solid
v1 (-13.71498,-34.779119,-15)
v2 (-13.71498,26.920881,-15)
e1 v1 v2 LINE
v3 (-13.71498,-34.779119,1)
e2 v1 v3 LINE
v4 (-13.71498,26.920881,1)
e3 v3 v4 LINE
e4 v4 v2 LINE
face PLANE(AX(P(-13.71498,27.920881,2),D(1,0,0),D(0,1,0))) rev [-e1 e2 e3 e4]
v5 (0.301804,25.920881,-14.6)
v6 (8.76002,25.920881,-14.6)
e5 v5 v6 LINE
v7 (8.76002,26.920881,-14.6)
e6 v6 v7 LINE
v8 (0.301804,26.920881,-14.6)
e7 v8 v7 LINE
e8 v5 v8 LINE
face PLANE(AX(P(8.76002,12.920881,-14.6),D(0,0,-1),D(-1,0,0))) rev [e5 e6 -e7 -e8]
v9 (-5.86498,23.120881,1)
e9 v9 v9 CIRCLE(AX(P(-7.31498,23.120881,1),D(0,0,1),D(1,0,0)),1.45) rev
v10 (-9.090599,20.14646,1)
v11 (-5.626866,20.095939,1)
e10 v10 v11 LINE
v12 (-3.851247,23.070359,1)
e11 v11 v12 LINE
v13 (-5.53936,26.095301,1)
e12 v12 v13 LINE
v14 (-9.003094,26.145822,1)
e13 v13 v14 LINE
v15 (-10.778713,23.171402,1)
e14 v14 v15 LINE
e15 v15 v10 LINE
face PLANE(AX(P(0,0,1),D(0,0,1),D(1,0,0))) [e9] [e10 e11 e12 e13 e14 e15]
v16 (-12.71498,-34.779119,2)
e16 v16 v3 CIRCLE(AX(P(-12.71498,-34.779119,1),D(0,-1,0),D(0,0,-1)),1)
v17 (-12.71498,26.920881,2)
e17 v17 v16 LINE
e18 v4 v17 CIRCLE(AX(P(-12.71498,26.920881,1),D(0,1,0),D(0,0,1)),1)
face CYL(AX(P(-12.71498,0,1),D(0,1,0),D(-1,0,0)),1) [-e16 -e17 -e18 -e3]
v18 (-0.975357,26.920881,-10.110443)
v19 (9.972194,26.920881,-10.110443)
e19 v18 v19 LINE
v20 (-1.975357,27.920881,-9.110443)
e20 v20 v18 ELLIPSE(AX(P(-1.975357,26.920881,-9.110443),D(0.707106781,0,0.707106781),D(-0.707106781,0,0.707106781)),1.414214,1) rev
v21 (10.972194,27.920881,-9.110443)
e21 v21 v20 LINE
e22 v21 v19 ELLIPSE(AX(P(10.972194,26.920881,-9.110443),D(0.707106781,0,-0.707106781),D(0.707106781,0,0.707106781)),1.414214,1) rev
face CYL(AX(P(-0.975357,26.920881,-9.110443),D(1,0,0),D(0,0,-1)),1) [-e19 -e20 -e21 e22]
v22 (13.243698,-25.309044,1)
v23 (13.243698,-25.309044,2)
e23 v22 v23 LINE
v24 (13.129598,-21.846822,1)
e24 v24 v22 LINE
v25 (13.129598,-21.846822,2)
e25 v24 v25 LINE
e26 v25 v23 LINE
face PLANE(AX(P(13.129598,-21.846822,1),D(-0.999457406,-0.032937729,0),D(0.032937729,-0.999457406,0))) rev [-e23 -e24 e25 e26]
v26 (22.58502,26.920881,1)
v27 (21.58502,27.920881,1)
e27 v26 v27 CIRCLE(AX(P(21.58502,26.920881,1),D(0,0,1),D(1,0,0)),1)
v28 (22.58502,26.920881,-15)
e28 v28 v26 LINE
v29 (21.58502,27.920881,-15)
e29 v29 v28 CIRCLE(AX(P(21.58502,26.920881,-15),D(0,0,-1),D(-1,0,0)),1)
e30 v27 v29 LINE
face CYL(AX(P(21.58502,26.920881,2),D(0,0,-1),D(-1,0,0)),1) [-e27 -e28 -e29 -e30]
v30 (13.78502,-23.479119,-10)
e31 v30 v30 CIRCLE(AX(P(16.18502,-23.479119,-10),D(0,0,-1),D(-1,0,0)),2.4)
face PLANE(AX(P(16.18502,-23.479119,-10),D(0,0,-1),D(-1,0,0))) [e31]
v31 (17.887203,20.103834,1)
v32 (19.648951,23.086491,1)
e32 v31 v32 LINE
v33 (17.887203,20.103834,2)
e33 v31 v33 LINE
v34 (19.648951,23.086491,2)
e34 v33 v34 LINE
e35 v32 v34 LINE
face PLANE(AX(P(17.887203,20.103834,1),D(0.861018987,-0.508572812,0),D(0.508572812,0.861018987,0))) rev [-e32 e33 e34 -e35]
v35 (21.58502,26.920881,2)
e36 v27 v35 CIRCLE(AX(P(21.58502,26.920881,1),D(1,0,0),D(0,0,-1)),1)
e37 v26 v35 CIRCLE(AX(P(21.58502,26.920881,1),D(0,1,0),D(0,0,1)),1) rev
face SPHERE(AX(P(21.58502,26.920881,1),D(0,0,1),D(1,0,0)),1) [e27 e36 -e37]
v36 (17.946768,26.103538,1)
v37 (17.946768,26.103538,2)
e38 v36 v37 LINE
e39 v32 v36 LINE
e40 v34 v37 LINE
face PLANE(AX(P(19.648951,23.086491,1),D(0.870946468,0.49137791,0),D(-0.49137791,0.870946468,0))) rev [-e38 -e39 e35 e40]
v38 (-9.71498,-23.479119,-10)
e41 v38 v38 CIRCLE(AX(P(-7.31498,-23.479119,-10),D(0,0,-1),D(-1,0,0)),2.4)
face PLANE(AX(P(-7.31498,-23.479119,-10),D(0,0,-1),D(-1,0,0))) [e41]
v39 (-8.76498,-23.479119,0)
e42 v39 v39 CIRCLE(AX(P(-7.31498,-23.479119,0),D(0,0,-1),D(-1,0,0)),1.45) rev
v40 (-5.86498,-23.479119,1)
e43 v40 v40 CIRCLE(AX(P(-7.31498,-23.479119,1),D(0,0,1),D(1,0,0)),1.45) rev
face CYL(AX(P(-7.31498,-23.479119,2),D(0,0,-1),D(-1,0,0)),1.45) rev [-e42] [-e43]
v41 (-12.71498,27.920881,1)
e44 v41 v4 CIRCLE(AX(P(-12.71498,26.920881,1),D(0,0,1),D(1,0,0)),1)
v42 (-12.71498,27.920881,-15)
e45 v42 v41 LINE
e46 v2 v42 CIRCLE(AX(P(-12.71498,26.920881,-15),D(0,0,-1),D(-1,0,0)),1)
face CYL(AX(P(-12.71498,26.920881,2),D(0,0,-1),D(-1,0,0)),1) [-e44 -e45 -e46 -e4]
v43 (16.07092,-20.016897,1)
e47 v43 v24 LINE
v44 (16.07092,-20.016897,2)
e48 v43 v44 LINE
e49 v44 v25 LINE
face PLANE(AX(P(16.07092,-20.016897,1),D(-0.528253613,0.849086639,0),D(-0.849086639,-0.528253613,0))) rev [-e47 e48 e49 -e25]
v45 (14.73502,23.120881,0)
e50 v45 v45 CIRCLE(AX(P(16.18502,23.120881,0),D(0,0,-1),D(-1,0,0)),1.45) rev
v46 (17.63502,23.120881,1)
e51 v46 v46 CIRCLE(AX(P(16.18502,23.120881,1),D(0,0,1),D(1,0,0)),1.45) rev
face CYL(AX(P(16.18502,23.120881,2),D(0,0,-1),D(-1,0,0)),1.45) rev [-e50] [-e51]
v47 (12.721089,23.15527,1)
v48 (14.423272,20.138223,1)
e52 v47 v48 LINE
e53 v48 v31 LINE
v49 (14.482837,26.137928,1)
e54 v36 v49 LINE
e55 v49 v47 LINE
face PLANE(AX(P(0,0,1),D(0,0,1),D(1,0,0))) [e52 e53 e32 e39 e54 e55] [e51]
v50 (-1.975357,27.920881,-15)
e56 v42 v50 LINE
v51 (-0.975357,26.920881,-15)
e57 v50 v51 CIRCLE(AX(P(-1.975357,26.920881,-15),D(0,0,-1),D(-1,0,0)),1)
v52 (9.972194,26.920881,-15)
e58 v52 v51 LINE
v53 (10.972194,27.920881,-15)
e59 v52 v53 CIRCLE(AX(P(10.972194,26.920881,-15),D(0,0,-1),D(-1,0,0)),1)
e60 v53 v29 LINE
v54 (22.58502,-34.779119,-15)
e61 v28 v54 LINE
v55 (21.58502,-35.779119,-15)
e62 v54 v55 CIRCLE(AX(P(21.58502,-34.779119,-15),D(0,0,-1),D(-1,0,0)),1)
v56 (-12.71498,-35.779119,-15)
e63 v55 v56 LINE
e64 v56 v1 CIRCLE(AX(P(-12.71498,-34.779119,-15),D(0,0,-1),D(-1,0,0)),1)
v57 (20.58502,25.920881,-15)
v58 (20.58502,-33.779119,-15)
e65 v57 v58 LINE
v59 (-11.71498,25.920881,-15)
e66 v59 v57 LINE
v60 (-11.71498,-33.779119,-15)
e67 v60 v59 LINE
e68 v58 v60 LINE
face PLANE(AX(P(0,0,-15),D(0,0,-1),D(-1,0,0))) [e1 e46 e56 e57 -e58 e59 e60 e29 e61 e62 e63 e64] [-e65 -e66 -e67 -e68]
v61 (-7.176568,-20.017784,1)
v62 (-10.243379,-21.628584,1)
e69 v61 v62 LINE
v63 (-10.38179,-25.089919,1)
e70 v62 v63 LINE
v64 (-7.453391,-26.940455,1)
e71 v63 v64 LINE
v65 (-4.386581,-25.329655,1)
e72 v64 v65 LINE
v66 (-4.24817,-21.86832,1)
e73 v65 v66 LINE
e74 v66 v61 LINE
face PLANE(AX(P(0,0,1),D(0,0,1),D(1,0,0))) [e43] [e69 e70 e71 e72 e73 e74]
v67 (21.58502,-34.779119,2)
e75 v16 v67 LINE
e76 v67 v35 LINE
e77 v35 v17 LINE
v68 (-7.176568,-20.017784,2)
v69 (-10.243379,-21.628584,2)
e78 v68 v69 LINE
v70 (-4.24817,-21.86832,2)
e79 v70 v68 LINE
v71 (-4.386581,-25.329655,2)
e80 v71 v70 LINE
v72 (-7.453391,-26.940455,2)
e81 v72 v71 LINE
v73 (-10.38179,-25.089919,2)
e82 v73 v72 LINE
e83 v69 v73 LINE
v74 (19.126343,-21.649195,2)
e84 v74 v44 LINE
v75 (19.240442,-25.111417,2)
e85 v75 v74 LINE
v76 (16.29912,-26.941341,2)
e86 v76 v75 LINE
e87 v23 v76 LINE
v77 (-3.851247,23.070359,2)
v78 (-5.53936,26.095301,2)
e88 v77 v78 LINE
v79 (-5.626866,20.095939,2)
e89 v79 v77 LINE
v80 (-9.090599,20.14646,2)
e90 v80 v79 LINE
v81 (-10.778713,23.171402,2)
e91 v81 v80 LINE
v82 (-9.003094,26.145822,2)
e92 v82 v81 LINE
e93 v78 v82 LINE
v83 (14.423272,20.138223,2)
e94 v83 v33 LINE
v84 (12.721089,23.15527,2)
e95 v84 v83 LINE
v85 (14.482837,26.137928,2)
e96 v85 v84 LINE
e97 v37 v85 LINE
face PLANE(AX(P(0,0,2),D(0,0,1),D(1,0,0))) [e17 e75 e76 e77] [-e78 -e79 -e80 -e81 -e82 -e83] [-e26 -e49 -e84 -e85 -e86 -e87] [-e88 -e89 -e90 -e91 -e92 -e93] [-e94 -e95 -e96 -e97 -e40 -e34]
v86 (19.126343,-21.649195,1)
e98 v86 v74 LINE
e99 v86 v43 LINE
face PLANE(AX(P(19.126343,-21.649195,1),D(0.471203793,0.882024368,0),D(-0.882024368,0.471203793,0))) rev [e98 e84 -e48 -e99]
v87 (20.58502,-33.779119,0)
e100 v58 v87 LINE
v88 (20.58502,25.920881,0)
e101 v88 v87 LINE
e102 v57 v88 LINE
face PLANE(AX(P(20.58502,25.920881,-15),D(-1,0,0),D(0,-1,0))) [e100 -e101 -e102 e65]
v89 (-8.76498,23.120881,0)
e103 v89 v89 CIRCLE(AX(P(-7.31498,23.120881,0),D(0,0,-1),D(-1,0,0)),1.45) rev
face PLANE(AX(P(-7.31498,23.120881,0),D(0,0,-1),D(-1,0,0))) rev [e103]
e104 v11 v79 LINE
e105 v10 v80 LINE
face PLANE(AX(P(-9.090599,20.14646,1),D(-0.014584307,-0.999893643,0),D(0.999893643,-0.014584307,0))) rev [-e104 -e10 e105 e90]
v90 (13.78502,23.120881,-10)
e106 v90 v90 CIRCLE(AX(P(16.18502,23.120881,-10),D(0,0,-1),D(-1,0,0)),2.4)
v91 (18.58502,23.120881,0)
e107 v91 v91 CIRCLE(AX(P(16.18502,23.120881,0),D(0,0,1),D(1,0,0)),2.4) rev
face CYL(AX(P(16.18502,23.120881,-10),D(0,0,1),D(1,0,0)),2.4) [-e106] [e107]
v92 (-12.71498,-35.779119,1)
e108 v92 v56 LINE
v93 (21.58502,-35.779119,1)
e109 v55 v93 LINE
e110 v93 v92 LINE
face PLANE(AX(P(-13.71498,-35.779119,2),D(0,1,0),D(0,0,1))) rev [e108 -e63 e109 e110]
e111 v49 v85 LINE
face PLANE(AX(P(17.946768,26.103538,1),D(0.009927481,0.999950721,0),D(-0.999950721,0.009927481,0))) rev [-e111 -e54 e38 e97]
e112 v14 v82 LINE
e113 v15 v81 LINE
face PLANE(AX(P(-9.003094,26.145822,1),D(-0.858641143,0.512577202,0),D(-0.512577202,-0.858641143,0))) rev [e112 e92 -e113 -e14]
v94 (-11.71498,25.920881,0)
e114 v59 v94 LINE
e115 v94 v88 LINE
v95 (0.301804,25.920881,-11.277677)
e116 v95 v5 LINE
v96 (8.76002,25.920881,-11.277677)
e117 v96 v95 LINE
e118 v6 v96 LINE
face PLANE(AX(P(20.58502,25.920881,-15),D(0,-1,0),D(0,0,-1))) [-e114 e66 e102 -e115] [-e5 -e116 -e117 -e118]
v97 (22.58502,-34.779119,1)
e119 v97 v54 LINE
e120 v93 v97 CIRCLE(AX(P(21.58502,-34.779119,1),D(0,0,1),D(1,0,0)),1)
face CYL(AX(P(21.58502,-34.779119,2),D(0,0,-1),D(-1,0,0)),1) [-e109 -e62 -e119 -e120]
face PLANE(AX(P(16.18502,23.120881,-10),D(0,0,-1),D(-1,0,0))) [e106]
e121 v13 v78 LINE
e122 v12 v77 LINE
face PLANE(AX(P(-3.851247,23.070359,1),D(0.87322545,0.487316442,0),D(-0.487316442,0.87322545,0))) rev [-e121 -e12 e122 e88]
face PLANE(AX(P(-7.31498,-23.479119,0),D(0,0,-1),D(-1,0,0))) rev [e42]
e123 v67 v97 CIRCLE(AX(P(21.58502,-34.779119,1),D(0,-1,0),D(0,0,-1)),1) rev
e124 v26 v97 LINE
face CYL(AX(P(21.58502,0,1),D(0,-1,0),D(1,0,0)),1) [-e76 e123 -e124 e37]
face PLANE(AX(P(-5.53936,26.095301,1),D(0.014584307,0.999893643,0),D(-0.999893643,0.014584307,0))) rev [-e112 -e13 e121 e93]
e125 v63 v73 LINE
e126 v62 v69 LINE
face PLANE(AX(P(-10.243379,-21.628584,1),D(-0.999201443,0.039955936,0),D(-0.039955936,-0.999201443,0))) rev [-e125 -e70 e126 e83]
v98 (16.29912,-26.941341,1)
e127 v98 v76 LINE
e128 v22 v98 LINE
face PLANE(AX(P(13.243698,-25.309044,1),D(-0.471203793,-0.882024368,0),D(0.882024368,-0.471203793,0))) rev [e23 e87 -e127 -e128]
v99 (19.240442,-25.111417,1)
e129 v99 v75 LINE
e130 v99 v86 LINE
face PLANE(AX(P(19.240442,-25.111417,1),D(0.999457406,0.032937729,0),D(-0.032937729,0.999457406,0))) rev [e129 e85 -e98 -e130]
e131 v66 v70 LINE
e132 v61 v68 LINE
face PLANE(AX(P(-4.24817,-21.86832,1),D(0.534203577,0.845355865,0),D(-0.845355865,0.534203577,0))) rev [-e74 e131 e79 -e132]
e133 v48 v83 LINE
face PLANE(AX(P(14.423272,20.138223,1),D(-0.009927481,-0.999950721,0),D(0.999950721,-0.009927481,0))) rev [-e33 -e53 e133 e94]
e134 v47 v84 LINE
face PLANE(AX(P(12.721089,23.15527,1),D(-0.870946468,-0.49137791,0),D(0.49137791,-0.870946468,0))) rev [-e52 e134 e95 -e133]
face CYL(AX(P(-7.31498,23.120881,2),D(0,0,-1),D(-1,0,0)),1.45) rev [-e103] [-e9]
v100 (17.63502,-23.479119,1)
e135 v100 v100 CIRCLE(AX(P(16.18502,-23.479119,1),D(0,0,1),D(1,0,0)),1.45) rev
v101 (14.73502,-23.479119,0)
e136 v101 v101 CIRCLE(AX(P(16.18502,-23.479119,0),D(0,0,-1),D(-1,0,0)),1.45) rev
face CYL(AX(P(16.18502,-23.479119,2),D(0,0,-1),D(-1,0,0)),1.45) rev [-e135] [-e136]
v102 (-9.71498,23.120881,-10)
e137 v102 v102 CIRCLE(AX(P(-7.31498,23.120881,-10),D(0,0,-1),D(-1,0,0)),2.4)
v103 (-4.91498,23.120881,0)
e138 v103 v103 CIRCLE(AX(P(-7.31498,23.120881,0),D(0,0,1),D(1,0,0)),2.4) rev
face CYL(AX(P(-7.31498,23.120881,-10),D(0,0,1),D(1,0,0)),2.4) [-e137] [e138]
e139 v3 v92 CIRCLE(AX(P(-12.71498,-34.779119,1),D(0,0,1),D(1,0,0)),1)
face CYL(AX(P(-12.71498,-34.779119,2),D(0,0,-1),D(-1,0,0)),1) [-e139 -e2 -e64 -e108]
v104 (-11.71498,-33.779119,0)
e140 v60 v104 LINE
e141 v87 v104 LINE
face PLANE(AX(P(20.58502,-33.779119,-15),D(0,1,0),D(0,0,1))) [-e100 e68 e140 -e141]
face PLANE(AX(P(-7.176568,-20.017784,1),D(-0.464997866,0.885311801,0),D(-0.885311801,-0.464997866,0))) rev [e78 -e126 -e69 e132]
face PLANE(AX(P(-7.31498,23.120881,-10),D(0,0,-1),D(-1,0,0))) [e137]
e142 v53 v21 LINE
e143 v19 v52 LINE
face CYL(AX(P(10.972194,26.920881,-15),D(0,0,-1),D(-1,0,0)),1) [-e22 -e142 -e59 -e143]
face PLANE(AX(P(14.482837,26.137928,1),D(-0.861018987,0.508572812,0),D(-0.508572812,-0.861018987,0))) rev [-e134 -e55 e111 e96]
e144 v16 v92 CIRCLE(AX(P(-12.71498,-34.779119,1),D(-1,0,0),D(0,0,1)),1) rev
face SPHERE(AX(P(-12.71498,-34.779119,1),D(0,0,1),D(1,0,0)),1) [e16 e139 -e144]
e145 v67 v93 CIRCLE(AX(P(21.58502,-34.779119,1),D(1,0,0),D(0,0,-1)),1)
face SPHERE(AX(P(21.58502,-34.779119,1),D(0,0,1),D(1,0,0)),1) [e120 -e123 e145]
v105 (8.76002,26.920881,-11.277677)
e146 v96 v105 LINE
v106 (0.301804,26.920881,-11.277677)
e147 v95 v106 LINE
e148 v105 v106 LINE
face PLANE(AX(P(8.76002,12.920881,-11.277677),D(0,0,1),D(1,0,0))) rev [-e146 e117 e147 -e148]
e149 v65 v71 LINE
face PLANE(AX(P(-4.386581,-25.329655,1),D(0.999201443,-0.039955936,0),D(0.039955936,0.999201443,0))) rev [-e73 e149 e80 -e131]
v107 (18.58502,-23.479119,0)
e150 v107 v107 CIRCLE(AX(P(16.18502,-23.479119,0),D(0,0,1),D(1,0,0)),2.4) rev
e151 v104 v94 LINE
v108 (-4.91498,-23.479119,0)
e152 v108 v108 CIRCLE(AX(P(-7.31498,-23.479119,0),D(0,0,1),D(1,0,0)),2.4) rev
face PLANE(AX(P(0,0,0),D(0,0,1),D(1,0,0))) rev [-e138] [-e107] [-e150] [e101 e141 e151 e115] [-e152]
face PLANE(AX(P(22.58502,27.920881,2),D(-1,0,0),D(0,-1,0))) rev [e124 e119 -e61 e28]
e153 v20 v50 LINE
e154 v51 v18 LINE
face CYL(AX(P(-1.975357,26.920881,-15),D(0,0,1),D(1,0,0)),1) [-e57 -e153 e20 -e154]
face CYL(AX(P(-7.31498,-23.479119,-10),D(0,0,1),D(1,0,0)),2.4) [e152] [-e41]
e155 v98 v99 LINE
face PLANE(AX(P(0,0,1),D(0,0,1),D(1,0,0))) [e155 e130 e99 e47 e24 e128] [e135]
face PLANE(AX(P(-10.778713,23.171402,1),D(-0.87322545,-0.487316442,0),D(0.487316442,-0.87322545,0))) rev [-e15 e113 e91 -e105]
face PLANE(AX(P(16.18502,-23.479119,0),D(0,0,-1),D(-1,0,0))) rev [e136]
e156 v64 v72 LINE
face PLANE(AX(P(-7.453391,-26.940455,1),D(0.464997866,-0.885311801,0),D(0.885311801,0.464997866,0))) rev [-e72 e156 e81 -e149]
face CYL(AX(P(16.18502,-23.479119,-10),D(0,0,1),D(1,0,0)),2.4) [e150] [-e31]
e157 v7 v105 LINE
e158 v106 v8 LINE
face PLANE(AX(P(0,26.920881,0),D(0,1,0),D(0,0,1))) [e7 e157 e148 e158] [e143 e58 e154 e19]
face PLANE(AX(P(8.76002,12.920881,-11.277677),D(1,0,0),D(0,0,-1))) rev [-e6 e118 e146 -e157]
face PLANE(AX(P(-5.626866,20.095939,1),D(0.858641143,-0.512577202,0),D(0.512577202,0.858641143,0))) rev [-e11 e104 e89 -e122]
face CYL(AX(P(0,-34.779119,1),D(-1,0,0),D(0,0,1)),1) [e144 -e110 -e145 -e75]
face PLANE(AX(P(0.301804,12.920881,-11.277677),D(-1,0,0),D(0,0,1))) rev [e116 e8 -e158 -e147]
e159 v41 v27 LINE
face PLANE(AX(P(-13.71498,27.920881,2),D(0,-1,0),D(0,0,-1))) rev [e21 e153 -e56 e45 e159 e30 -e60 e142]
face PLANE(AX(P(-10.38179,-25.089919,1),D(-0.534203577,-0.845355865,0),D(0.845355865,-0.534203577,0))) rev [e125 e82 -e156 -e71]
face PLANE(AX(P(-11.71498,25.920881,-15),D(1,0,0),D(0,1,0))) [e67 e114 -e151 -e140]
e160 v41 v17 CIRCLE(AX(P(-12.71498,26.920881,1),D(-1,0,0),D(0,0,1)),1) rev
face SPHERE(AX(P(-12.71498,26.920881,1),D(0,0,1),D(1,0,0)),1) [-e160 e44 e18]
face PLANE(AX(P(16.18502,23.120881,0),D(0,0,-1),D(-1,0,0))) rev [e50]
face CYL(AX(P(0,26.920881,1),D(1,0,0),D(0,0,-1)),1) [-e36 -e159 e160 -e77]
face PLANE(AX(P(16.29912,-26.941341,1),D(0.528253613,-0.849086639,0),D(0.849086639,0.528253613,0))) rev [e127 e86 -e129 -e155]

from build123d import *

# Parameters (mm, degrees)
CROQUIS1_W              = 36.3
CROQUIS1_H              = 63.7
SALIENTE_EXTRUIR1_DEPTH = 2
CROQUIS2_R              = 1.45
CORTAR_EXTRUIR1_DEPTH   = 43.35833467
CROQUIS3_W              = 36.3
CROQUIS3_H              = 63.7
CROQUIS3_W_2            = 32.3
CROQUIS3_H_2            = 59.7
SALIENTE_EXTRUIR2_DEPTH = 15
CROQUIS4_W              = 8.458215844
CROQUIS4_H              = 3.322323253
CORTAR_EXTRUIR2_DEPTH   = 15
CROQUIS5_W              = 10.947551138
CROQUIS5_H              = 4.889557179
CORTAR_EXTRUIR3_DEPTH   = 1
CROQUIS6_R              = 2.4
SALIENTE_EXTRUIR3_DEPTH = 10
REDONDEO1_R             = 1
CORTAR_EXTRUIR4_DEPTH   = 1


with BuildPart() as part:
    # Croquis1 → Saliente-Extruir1 (new body)
    with BuildSketch(Plane.XY):
        with Locations((4.435020115, -3.929119363)):
            Rectangle(CROQUIS1_W, CROQUIS1_H)
    extrude(amount=SALIENTE_EXTRUIR1_DEPTH)

    # Croquis2 → Cortar-Extruir1 (cut, through all)
    with BuildSketch(Plane(origin=(0, 0, 0), x_dir=(-1, 0, 0), z_dir=(0, 0, -1))):
        with Locations((-16.185020115, 23.120880637)):
            Circle(CROQUIS2_R)
        with Locations((7.314979885, 23.120880637)):
            Circle(CROQUIS2_R)
        with Locations((7.314979885, -23.479119363)):
            Circle(CROQUIS2_R)
        with Locations((-16.185020115, -23.479119363)):
            Circle(CROQUIS2_R)
    extrude(amount=-CORTAR_EXTRUIR1_DEPTH, mode=Mode.SUBTRACT)

    # Croquis3 → Saliente-Extruir2 (add)
    with BuildSketch(Plane(origin=(0, 0, 0), x_dir=(-1, 0, 0), z_dir=(0, 0, -1))):
        with Locations((-4.435020115, -3.929119363)):
            Rectangle(CROQUIS3_W, CROQUIS3_H)
        with Locations((-4.435020115, -3.929119363)):
            Rectangle(CROQUIS3_W_2, CROQUIS3_H_2, mode=Mode.SUBTRACT)
    extrude(amount=SALIENTE_EXTRUIR2_DEPTH)

    # Croquis4 → Cortar-Extruir2 (cut)
    with BuildSketch(Plane(origin=(0, 27.920880637, 0), x_dir=(1, 0, 0), z_dir=(0, 1, 0))):
        with Locations((4.530912193, 12.938838374)):
            Rectangle(CROQUIS4_W, CROQUIS4_H)
    extrude(amount=-CORTAR_EXTRUIR2_DEPTH, mode=Mode.SUBTRACT)

    # Croquis5 → Cortar-Extruir3 (cut)
    with BuildSketch(Plane(origin=(0, 27.920880637, 0), x_dir=(1, 0, 0), z_dir=(0, 1, 0))):
        with Locations((4.498418707, 12.555221411)):
            Rectangle(CROQUIS5_W, CROQUIS5_H)
    extrude(amount=-CORTAR_EXTRUIR3_DEPTH, mode=Mode.SUBTRACT)

    # Croquis6 → Saliente-Extruir3 (add)
    with BuildSketch(Plane(origin=(0, 0, 0), x_dir=(-1, 0, 0), z_dir=(0, 0, -1))):
        with Locations(Location((-16.185020115, 23.120880637, 0), (0, 0, 180))):
            Circle(CROQUIS6_R)
        with Locations(Location((7.314979885, 23.120880637, 0), (0, 0, 180))):
            Circle(CROQUIS6_R)
        with Locations(Location((7.314979885, -23.479119363, 0), (0, 0, 180))):
            Circle(CROQUIS6_R)
        with Locations(Location((-16.185020115, -23.479119363, 0), (0, 0, 180))):
            Circle(CROQUIS6_R)
    extrude(amount=SALIENTE_EXTRUIR3_DEPTH)

    # Redondeo1
    redondeo1_edges = [part.edges().sort_by_distance(p)[0] for p in [
        (-0.975356862, 27.920880637, -12.55522141),
        (4.498418707, 27.920880637, -10.110442821),
        (9.972194276, 27.920880637, -12.55522141),
        (22.585020115, -3.929119363, 2),
        (22.585020115, -35.779119363, -6.5),
        (4.435020115, -35.779119363, 2),
        (-13.714979885, -35.779119363, -6.5),
        (-13.714979885, -3.929119363, 2),
        (4.435020115, 27.920880637, 2),
        (-13.714979885, 27.920880637, -6.5),
        (22.585020115, 27.920880637, -6.5),
    ]]
    fillet(redondeo1_edges, radius=REDONDEO1_R - 0.0001)  # a hair under: the kernel refuses the full size

    # Croquis7 → Cortar-Extruir4 (cut)
    with BuildSketch(Plane.XY.offset(2)):
        Polygon((-5.626866213, 20.095938946), (-3.8512467, 23.070359116), (-5.539360372, 26.095300806), (-9.003093557, 26.145822327), (-10.77871307, 23.171402157), (-9.090599398, 20.146460467), align=None)
        Polygon((17.887203126, 20.103833571), (19.648951024, 23.086490833), (17.946768013, 26.103537899), (14.482837104, 26.137927702), (12.721089206, 23.15527044), (14.423272217, 20.138223374), align=None)
        Polygon((-4.386581268, -25.329654838), (-4.248169845, -21.868319506), (-7.176568462, -20.017784032), (-10.243378502, -21.628583889), (-10.381789925, -25.089919221), (-7.453391308, -26.940454695), align=None)
        Polygon((19.240442153, -25.111417183), (19.126342512, -21.649195169), (16.070920474, -20.01689735), (13.129598077, -21.846821544), (13.243697718, -25.309043558), (16.299119756, -26.941341377), align=None)
    extrude(amount=-CORTAR_EXTRUIR4_DEPTH, mode=Mode.SUBTRACT)


solid = part.part
